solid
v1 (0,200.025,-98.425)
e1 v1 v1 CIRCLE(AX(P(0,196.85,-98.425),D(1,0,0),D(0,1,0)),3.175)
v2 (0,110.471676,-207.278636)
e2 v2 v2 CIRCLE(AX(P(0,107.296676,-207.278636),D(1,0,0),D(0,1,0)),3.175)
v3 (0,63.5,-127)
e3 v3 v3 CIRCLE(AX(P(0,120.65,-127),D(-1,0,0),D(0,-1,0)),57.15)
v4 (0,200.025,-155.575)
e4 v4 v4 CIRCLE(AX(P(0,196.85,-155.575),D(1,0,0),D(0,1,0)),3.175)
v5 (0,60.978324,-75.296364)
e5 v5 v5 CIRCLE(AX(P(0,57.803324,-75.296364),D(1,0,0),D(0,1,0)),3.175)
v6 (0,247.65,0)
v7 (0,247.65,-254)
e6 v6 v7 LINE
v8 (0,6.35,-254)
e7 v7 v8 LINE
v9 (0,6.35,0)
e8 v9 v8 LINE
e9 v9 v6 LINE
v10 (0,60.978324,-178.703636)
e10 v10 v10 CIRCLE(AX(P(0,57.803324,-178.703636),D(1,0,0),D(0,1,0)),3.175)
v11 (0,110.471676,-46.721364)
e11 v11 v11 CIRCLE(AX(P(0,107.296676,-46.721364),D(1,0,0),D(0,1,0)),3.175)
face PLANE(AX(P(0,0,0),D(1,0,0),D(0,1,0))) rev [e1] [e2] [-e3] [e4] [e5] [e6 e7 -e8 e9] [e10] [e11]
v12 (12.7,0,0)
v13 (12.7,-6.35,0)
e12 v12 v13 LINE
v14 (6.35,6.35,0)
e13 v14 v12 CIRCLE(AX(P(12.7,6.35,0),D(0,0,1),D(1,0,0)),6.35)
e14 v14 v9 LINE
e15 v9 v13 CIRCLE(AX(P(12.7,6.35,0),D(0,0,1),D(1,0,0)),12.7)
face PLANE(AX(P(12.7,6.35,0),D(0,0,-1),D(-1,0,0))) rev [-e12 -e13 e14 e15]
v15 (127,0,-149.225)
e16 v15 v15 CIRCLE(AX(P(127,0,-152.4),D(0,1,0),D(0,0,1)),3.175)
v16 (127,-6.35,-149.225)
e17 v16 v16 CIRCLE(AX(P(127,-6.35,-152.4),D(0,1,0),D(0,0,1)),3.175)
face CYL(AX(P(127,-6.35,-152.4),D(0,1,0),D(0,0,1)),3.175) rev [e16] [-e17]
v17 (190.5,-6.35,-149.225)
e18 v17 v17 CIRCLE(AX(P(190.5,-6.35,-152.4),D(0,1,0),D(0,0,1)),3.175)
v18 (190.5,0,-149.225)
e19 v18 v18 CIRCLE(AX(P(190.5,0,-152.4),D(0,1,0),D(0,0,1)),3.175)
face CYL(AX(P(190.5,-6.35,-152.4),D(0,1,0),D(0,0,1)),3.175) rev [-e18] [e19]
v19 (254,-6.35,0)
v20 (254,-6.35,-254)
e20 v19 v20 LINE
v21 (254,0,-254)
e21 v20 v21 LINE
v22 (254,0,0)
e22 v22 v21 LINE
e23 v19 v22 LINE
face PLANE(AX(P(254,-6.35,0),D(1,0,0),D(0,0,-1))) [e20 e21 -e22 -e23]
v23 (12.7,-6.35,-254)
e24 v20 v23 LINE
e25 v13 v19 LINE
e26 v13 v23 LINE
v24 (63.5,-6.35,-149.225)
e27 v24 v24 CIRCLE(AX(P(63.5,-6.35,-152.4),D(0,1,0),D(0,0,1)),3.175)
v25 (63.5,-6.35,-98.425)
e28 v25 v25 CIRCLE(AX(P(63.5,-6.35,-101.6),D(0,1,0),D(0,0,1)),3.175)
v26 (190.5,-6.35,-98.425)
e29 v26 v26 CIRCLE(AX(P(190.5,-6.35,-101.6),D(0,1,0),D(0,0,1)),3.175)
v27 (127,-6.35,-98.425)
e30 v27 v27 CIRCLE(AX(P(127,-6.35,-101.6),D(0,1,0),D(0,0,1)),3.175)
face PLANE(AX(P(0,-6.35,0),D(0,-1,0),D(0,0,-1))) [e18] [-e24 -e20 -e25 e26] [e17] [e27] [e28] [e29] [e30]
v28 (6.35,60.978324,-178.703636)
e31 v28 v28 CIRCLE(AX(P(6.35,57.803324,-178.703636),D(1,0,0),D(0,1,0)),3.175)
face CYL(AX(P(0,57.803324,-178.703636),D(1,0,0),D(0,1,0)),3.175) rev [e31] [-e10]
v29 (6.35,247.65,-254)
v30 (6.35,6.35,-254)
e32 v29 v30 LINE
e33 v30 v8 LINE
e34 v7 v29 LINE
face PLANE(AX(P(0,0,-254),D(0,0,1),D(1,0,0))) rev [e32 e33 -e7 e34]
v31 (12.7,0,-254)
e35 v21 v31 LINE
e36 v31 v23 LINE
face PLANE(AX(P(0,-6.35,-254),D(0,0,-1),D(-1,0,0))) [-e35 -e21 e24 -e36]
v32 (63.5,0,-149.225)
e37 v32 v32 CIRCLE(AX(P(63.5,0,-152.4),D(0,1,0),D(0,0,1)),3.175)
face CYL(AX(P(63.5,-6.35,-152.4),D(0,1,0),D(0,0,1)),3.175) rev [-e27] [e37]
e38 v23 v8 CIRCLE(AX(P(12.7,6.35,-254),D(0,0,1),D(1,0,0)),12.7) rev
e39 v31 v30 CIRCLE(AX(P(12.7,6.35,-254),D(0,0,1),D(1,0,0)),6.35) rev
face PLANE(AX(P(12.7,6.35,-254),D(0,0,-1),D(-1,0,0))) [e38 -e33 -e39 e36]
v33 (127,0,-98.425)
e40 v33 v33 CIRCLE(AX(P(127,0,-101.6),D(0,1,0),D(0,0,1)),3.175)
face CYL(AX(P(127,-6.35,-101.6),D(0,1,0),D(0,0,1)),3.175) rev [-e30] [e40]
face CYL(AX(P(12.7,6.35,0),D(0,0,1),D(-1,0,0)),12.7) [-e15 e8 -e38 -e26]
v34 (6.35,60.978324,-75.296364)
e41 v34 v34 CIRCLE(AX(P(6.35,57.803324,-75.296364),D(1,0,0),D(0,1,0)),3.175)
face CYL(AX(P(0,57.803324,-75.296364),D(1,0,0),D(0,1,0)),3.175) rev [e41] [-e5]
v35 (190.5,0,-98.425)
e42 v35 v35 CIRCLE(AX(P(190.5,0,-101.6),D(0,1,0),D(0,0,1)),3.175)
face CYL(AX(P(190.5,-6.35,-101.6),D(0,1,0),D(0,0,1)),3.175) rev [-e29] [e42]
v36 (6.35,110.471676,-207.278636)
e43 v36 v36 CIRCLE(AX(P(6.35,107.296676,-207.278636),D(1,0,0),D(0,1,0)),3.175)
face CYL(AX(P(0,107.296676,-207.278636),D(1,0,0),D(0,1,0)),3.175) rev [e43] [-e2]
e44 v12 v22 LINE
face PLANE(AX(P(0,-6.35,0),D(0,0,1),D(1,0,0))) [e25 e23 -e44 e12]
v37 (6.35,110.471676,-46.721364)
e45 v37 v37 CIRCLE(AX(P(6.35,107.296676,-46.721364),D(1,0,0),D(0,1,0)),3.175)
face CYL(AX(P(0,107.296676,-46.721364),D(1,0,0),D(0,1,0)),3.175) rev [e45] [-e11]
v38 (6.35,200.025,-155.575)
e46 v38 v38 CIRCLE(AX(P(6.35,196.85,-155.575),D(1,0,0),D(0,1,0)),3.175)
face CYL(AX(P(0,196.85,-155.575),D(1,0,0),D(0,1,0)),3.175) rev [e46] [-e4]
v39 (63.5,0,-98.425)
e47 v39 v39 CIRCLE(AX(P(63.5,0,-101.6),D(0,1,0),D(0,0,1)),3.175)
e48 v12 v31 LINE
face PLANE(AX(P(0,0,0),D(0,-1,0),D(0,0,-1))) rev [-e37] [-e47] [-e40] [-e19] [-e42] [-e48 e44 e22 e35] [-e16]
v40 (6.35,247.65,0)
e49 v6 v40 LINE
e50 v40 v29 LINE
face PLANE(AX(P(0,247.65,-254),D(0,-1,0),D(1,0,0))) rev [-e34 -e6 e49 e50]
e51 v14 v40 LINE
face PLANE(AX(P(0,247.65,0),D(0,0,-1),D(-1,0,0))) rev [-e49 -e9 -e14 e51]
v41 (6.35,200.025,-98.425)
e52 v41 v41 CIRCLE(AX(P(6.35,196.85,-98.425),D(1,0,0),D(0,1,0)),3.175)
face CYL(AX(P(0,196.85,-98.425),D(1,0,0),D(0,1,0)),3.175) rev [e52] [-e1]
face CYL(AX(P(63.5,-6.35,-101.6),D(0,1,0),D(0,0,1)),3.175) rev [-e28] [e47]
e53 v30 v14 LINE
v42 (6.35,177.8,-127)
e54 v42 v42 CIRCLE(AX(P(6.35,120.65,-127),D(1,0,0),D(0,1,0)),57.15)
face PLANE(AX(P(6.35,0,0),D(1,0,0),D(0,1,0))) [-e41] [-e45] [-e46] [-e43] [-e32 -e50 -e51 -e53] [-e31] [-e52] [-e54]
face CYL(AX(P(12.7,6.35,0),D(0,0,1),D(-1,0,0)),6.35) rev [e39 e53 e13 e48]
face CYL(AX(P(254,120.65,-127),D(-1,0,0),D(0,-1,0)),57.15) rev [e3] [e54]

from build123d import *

# Parameters (mm, degrees)
SKETCH2_W                    = 254
SKETCH2_H                    = 254
SKETCH2_R                    = 3.175
BASE_FLANGE1_DEPTH           = 6.35
EDGE_FLANGE1_STRIP_W         = 38.1
EDGE_FLANGE1_STRIP_H         = 6.35
EDGE_FLANGE1_STRIP_CUT_DEPTH = 254
EDGE_FLANGE1_DEPTH           = 254
SKETCH10_R                   = 57.15
CUT_EXTRUDE1_DEPTH           = 437.305538012
SKETCH12_R                   = 3.175
CUT_EXTRUDE2_DEPTH           = 433.639624861


# Sheet-metal steps are written as plain solids
with BuildPart() as part:
    # Sketch2 → Base-Flange1 (new body)
    with BuildSketch(Plane(origin=(0, 0, 0), x_dir=(1, 0, 0), z_dir=(0, 1, 0))):
        with Locations((127, 127)):
            Rectangle(SKETCH2_W, SKETCH2_H)
        with Locations(Location((190.5, 152.4, 0), (0, 0, 270))):
            Circle(SKETCH2_R, mode=Mode.SUBTRACT)
        with Locations(Location((127, 152.4, 0), (0, 0, 270))):
            Circle(SKETCH2_R, mode=Mode.SUBTRACT)
        with Locations(Location((63.5, 152.4, 0), (0, 0, 270))):
            Circle(SKETCH2_R, mode=Mode.SUBTRACT)
        with Locations(Location((127, 101.6, 0), (0, 0, 270))):
            Circle(SKETCH2_R, mode=Mode.SUBTRACT)
        with Locations(Location((63.5, 101.6, 0), (0, 0, 270))):
            Circle(SKETCH2_R, mode=Mode.SUBTRACT)
        with Locations(Location((190.5, 101.6, 0), (0, 0, 270))):
            Circle(SKETCH2_R, mode=Mode.SUBTRACT)
    extrude(amount=-BASE_FLANGE1_DEPTH)

    # Edge-Flange1 strip (across the edge) → Edge-Flange1 strip cut (cut)
    with BuildSketch(Plane.XY.offset(-254)):
        with Locations((-6.35, -3.175)):
            Rectangle(EDGE_FLANGE1_STRIP_W, EDGE_FLANGE1_STRIP_H)
    extrude(amount=EDGE_FLANGE1_STRIP_CUT_DEPTH, mode=Mode.SUBTRACT)

    # Edge-Flange1 section (across the edge) → Edge-Flange1 (add)
    with BuildSketch(Plane.XY.offset(-254)):
        with BuildLine():
            Line((0, 6.35), (0, 247.65))
            Line((0, 247.65), (6.35, 247.65))
            Line((6.35, 247.65), (6.35, 6.35))
            ThreePointArc((6.35, 6.35), (8.209871939, 1.859871939), (12.7, 0))
            Line((12.7, 0), (12.7, -6.35))
            ThreePointArc((12.7, -6.35), (3.719743879, -2.630256121), (0, 6.35))
        make_face()
    extrude(amount=EDGE_FLANGE1_DEPTH)

    # Sketch10 → Cut-Extrude1 (cut, through all)
    with BuildSketch(Plane.ZY):
        with Locations(Location((-127, 120.65, 0), (0, 0, 270))):
            Circle(SKETCH10_R)
    extrude(amount=-CUT_EXTRUDE1_DEPTH, mode=Mode.SUBTRACT)

    # Sketch12 → Cut-Extrude2 (cut, through all)
    with BuildSketch(Plane(origin=(6.35, 0, 0), x_dir=(0, 0, -1), z_dir=(1, 0, 0))):
        with Locations(Location((75.296364232, 57.803324087, 0), (0, 0, 90))):
            Circle(SKETCH12_R)
        with Locations(Location((46.721364232, 107.296675913, 0), (0, 0, 90))):
            Circle(SKETCH12_R)
        with Locations(Location((98.425, 196.85, 0), (0, 0, 90))):
            Circle(SKETCH12_R)
        with Locations(Location((155.575, 196.85, 0), (0, 0, 90))):
            Circle(SKETCH12_R)
        with Locations(Location((178.703635768, 57.803324087, 0), (0, 0, 90))):
            Circle(SKETCH12_R)
        with Locations(Location((207.278635768, 107.296675913, 0), (0, 0, 90))):
            Circle(SKETCH12_R)
    extrude(amount=-CUT_EXTRUDE2_DEPTH, mode=Mode.SUBTRACT)


solid = part.part
